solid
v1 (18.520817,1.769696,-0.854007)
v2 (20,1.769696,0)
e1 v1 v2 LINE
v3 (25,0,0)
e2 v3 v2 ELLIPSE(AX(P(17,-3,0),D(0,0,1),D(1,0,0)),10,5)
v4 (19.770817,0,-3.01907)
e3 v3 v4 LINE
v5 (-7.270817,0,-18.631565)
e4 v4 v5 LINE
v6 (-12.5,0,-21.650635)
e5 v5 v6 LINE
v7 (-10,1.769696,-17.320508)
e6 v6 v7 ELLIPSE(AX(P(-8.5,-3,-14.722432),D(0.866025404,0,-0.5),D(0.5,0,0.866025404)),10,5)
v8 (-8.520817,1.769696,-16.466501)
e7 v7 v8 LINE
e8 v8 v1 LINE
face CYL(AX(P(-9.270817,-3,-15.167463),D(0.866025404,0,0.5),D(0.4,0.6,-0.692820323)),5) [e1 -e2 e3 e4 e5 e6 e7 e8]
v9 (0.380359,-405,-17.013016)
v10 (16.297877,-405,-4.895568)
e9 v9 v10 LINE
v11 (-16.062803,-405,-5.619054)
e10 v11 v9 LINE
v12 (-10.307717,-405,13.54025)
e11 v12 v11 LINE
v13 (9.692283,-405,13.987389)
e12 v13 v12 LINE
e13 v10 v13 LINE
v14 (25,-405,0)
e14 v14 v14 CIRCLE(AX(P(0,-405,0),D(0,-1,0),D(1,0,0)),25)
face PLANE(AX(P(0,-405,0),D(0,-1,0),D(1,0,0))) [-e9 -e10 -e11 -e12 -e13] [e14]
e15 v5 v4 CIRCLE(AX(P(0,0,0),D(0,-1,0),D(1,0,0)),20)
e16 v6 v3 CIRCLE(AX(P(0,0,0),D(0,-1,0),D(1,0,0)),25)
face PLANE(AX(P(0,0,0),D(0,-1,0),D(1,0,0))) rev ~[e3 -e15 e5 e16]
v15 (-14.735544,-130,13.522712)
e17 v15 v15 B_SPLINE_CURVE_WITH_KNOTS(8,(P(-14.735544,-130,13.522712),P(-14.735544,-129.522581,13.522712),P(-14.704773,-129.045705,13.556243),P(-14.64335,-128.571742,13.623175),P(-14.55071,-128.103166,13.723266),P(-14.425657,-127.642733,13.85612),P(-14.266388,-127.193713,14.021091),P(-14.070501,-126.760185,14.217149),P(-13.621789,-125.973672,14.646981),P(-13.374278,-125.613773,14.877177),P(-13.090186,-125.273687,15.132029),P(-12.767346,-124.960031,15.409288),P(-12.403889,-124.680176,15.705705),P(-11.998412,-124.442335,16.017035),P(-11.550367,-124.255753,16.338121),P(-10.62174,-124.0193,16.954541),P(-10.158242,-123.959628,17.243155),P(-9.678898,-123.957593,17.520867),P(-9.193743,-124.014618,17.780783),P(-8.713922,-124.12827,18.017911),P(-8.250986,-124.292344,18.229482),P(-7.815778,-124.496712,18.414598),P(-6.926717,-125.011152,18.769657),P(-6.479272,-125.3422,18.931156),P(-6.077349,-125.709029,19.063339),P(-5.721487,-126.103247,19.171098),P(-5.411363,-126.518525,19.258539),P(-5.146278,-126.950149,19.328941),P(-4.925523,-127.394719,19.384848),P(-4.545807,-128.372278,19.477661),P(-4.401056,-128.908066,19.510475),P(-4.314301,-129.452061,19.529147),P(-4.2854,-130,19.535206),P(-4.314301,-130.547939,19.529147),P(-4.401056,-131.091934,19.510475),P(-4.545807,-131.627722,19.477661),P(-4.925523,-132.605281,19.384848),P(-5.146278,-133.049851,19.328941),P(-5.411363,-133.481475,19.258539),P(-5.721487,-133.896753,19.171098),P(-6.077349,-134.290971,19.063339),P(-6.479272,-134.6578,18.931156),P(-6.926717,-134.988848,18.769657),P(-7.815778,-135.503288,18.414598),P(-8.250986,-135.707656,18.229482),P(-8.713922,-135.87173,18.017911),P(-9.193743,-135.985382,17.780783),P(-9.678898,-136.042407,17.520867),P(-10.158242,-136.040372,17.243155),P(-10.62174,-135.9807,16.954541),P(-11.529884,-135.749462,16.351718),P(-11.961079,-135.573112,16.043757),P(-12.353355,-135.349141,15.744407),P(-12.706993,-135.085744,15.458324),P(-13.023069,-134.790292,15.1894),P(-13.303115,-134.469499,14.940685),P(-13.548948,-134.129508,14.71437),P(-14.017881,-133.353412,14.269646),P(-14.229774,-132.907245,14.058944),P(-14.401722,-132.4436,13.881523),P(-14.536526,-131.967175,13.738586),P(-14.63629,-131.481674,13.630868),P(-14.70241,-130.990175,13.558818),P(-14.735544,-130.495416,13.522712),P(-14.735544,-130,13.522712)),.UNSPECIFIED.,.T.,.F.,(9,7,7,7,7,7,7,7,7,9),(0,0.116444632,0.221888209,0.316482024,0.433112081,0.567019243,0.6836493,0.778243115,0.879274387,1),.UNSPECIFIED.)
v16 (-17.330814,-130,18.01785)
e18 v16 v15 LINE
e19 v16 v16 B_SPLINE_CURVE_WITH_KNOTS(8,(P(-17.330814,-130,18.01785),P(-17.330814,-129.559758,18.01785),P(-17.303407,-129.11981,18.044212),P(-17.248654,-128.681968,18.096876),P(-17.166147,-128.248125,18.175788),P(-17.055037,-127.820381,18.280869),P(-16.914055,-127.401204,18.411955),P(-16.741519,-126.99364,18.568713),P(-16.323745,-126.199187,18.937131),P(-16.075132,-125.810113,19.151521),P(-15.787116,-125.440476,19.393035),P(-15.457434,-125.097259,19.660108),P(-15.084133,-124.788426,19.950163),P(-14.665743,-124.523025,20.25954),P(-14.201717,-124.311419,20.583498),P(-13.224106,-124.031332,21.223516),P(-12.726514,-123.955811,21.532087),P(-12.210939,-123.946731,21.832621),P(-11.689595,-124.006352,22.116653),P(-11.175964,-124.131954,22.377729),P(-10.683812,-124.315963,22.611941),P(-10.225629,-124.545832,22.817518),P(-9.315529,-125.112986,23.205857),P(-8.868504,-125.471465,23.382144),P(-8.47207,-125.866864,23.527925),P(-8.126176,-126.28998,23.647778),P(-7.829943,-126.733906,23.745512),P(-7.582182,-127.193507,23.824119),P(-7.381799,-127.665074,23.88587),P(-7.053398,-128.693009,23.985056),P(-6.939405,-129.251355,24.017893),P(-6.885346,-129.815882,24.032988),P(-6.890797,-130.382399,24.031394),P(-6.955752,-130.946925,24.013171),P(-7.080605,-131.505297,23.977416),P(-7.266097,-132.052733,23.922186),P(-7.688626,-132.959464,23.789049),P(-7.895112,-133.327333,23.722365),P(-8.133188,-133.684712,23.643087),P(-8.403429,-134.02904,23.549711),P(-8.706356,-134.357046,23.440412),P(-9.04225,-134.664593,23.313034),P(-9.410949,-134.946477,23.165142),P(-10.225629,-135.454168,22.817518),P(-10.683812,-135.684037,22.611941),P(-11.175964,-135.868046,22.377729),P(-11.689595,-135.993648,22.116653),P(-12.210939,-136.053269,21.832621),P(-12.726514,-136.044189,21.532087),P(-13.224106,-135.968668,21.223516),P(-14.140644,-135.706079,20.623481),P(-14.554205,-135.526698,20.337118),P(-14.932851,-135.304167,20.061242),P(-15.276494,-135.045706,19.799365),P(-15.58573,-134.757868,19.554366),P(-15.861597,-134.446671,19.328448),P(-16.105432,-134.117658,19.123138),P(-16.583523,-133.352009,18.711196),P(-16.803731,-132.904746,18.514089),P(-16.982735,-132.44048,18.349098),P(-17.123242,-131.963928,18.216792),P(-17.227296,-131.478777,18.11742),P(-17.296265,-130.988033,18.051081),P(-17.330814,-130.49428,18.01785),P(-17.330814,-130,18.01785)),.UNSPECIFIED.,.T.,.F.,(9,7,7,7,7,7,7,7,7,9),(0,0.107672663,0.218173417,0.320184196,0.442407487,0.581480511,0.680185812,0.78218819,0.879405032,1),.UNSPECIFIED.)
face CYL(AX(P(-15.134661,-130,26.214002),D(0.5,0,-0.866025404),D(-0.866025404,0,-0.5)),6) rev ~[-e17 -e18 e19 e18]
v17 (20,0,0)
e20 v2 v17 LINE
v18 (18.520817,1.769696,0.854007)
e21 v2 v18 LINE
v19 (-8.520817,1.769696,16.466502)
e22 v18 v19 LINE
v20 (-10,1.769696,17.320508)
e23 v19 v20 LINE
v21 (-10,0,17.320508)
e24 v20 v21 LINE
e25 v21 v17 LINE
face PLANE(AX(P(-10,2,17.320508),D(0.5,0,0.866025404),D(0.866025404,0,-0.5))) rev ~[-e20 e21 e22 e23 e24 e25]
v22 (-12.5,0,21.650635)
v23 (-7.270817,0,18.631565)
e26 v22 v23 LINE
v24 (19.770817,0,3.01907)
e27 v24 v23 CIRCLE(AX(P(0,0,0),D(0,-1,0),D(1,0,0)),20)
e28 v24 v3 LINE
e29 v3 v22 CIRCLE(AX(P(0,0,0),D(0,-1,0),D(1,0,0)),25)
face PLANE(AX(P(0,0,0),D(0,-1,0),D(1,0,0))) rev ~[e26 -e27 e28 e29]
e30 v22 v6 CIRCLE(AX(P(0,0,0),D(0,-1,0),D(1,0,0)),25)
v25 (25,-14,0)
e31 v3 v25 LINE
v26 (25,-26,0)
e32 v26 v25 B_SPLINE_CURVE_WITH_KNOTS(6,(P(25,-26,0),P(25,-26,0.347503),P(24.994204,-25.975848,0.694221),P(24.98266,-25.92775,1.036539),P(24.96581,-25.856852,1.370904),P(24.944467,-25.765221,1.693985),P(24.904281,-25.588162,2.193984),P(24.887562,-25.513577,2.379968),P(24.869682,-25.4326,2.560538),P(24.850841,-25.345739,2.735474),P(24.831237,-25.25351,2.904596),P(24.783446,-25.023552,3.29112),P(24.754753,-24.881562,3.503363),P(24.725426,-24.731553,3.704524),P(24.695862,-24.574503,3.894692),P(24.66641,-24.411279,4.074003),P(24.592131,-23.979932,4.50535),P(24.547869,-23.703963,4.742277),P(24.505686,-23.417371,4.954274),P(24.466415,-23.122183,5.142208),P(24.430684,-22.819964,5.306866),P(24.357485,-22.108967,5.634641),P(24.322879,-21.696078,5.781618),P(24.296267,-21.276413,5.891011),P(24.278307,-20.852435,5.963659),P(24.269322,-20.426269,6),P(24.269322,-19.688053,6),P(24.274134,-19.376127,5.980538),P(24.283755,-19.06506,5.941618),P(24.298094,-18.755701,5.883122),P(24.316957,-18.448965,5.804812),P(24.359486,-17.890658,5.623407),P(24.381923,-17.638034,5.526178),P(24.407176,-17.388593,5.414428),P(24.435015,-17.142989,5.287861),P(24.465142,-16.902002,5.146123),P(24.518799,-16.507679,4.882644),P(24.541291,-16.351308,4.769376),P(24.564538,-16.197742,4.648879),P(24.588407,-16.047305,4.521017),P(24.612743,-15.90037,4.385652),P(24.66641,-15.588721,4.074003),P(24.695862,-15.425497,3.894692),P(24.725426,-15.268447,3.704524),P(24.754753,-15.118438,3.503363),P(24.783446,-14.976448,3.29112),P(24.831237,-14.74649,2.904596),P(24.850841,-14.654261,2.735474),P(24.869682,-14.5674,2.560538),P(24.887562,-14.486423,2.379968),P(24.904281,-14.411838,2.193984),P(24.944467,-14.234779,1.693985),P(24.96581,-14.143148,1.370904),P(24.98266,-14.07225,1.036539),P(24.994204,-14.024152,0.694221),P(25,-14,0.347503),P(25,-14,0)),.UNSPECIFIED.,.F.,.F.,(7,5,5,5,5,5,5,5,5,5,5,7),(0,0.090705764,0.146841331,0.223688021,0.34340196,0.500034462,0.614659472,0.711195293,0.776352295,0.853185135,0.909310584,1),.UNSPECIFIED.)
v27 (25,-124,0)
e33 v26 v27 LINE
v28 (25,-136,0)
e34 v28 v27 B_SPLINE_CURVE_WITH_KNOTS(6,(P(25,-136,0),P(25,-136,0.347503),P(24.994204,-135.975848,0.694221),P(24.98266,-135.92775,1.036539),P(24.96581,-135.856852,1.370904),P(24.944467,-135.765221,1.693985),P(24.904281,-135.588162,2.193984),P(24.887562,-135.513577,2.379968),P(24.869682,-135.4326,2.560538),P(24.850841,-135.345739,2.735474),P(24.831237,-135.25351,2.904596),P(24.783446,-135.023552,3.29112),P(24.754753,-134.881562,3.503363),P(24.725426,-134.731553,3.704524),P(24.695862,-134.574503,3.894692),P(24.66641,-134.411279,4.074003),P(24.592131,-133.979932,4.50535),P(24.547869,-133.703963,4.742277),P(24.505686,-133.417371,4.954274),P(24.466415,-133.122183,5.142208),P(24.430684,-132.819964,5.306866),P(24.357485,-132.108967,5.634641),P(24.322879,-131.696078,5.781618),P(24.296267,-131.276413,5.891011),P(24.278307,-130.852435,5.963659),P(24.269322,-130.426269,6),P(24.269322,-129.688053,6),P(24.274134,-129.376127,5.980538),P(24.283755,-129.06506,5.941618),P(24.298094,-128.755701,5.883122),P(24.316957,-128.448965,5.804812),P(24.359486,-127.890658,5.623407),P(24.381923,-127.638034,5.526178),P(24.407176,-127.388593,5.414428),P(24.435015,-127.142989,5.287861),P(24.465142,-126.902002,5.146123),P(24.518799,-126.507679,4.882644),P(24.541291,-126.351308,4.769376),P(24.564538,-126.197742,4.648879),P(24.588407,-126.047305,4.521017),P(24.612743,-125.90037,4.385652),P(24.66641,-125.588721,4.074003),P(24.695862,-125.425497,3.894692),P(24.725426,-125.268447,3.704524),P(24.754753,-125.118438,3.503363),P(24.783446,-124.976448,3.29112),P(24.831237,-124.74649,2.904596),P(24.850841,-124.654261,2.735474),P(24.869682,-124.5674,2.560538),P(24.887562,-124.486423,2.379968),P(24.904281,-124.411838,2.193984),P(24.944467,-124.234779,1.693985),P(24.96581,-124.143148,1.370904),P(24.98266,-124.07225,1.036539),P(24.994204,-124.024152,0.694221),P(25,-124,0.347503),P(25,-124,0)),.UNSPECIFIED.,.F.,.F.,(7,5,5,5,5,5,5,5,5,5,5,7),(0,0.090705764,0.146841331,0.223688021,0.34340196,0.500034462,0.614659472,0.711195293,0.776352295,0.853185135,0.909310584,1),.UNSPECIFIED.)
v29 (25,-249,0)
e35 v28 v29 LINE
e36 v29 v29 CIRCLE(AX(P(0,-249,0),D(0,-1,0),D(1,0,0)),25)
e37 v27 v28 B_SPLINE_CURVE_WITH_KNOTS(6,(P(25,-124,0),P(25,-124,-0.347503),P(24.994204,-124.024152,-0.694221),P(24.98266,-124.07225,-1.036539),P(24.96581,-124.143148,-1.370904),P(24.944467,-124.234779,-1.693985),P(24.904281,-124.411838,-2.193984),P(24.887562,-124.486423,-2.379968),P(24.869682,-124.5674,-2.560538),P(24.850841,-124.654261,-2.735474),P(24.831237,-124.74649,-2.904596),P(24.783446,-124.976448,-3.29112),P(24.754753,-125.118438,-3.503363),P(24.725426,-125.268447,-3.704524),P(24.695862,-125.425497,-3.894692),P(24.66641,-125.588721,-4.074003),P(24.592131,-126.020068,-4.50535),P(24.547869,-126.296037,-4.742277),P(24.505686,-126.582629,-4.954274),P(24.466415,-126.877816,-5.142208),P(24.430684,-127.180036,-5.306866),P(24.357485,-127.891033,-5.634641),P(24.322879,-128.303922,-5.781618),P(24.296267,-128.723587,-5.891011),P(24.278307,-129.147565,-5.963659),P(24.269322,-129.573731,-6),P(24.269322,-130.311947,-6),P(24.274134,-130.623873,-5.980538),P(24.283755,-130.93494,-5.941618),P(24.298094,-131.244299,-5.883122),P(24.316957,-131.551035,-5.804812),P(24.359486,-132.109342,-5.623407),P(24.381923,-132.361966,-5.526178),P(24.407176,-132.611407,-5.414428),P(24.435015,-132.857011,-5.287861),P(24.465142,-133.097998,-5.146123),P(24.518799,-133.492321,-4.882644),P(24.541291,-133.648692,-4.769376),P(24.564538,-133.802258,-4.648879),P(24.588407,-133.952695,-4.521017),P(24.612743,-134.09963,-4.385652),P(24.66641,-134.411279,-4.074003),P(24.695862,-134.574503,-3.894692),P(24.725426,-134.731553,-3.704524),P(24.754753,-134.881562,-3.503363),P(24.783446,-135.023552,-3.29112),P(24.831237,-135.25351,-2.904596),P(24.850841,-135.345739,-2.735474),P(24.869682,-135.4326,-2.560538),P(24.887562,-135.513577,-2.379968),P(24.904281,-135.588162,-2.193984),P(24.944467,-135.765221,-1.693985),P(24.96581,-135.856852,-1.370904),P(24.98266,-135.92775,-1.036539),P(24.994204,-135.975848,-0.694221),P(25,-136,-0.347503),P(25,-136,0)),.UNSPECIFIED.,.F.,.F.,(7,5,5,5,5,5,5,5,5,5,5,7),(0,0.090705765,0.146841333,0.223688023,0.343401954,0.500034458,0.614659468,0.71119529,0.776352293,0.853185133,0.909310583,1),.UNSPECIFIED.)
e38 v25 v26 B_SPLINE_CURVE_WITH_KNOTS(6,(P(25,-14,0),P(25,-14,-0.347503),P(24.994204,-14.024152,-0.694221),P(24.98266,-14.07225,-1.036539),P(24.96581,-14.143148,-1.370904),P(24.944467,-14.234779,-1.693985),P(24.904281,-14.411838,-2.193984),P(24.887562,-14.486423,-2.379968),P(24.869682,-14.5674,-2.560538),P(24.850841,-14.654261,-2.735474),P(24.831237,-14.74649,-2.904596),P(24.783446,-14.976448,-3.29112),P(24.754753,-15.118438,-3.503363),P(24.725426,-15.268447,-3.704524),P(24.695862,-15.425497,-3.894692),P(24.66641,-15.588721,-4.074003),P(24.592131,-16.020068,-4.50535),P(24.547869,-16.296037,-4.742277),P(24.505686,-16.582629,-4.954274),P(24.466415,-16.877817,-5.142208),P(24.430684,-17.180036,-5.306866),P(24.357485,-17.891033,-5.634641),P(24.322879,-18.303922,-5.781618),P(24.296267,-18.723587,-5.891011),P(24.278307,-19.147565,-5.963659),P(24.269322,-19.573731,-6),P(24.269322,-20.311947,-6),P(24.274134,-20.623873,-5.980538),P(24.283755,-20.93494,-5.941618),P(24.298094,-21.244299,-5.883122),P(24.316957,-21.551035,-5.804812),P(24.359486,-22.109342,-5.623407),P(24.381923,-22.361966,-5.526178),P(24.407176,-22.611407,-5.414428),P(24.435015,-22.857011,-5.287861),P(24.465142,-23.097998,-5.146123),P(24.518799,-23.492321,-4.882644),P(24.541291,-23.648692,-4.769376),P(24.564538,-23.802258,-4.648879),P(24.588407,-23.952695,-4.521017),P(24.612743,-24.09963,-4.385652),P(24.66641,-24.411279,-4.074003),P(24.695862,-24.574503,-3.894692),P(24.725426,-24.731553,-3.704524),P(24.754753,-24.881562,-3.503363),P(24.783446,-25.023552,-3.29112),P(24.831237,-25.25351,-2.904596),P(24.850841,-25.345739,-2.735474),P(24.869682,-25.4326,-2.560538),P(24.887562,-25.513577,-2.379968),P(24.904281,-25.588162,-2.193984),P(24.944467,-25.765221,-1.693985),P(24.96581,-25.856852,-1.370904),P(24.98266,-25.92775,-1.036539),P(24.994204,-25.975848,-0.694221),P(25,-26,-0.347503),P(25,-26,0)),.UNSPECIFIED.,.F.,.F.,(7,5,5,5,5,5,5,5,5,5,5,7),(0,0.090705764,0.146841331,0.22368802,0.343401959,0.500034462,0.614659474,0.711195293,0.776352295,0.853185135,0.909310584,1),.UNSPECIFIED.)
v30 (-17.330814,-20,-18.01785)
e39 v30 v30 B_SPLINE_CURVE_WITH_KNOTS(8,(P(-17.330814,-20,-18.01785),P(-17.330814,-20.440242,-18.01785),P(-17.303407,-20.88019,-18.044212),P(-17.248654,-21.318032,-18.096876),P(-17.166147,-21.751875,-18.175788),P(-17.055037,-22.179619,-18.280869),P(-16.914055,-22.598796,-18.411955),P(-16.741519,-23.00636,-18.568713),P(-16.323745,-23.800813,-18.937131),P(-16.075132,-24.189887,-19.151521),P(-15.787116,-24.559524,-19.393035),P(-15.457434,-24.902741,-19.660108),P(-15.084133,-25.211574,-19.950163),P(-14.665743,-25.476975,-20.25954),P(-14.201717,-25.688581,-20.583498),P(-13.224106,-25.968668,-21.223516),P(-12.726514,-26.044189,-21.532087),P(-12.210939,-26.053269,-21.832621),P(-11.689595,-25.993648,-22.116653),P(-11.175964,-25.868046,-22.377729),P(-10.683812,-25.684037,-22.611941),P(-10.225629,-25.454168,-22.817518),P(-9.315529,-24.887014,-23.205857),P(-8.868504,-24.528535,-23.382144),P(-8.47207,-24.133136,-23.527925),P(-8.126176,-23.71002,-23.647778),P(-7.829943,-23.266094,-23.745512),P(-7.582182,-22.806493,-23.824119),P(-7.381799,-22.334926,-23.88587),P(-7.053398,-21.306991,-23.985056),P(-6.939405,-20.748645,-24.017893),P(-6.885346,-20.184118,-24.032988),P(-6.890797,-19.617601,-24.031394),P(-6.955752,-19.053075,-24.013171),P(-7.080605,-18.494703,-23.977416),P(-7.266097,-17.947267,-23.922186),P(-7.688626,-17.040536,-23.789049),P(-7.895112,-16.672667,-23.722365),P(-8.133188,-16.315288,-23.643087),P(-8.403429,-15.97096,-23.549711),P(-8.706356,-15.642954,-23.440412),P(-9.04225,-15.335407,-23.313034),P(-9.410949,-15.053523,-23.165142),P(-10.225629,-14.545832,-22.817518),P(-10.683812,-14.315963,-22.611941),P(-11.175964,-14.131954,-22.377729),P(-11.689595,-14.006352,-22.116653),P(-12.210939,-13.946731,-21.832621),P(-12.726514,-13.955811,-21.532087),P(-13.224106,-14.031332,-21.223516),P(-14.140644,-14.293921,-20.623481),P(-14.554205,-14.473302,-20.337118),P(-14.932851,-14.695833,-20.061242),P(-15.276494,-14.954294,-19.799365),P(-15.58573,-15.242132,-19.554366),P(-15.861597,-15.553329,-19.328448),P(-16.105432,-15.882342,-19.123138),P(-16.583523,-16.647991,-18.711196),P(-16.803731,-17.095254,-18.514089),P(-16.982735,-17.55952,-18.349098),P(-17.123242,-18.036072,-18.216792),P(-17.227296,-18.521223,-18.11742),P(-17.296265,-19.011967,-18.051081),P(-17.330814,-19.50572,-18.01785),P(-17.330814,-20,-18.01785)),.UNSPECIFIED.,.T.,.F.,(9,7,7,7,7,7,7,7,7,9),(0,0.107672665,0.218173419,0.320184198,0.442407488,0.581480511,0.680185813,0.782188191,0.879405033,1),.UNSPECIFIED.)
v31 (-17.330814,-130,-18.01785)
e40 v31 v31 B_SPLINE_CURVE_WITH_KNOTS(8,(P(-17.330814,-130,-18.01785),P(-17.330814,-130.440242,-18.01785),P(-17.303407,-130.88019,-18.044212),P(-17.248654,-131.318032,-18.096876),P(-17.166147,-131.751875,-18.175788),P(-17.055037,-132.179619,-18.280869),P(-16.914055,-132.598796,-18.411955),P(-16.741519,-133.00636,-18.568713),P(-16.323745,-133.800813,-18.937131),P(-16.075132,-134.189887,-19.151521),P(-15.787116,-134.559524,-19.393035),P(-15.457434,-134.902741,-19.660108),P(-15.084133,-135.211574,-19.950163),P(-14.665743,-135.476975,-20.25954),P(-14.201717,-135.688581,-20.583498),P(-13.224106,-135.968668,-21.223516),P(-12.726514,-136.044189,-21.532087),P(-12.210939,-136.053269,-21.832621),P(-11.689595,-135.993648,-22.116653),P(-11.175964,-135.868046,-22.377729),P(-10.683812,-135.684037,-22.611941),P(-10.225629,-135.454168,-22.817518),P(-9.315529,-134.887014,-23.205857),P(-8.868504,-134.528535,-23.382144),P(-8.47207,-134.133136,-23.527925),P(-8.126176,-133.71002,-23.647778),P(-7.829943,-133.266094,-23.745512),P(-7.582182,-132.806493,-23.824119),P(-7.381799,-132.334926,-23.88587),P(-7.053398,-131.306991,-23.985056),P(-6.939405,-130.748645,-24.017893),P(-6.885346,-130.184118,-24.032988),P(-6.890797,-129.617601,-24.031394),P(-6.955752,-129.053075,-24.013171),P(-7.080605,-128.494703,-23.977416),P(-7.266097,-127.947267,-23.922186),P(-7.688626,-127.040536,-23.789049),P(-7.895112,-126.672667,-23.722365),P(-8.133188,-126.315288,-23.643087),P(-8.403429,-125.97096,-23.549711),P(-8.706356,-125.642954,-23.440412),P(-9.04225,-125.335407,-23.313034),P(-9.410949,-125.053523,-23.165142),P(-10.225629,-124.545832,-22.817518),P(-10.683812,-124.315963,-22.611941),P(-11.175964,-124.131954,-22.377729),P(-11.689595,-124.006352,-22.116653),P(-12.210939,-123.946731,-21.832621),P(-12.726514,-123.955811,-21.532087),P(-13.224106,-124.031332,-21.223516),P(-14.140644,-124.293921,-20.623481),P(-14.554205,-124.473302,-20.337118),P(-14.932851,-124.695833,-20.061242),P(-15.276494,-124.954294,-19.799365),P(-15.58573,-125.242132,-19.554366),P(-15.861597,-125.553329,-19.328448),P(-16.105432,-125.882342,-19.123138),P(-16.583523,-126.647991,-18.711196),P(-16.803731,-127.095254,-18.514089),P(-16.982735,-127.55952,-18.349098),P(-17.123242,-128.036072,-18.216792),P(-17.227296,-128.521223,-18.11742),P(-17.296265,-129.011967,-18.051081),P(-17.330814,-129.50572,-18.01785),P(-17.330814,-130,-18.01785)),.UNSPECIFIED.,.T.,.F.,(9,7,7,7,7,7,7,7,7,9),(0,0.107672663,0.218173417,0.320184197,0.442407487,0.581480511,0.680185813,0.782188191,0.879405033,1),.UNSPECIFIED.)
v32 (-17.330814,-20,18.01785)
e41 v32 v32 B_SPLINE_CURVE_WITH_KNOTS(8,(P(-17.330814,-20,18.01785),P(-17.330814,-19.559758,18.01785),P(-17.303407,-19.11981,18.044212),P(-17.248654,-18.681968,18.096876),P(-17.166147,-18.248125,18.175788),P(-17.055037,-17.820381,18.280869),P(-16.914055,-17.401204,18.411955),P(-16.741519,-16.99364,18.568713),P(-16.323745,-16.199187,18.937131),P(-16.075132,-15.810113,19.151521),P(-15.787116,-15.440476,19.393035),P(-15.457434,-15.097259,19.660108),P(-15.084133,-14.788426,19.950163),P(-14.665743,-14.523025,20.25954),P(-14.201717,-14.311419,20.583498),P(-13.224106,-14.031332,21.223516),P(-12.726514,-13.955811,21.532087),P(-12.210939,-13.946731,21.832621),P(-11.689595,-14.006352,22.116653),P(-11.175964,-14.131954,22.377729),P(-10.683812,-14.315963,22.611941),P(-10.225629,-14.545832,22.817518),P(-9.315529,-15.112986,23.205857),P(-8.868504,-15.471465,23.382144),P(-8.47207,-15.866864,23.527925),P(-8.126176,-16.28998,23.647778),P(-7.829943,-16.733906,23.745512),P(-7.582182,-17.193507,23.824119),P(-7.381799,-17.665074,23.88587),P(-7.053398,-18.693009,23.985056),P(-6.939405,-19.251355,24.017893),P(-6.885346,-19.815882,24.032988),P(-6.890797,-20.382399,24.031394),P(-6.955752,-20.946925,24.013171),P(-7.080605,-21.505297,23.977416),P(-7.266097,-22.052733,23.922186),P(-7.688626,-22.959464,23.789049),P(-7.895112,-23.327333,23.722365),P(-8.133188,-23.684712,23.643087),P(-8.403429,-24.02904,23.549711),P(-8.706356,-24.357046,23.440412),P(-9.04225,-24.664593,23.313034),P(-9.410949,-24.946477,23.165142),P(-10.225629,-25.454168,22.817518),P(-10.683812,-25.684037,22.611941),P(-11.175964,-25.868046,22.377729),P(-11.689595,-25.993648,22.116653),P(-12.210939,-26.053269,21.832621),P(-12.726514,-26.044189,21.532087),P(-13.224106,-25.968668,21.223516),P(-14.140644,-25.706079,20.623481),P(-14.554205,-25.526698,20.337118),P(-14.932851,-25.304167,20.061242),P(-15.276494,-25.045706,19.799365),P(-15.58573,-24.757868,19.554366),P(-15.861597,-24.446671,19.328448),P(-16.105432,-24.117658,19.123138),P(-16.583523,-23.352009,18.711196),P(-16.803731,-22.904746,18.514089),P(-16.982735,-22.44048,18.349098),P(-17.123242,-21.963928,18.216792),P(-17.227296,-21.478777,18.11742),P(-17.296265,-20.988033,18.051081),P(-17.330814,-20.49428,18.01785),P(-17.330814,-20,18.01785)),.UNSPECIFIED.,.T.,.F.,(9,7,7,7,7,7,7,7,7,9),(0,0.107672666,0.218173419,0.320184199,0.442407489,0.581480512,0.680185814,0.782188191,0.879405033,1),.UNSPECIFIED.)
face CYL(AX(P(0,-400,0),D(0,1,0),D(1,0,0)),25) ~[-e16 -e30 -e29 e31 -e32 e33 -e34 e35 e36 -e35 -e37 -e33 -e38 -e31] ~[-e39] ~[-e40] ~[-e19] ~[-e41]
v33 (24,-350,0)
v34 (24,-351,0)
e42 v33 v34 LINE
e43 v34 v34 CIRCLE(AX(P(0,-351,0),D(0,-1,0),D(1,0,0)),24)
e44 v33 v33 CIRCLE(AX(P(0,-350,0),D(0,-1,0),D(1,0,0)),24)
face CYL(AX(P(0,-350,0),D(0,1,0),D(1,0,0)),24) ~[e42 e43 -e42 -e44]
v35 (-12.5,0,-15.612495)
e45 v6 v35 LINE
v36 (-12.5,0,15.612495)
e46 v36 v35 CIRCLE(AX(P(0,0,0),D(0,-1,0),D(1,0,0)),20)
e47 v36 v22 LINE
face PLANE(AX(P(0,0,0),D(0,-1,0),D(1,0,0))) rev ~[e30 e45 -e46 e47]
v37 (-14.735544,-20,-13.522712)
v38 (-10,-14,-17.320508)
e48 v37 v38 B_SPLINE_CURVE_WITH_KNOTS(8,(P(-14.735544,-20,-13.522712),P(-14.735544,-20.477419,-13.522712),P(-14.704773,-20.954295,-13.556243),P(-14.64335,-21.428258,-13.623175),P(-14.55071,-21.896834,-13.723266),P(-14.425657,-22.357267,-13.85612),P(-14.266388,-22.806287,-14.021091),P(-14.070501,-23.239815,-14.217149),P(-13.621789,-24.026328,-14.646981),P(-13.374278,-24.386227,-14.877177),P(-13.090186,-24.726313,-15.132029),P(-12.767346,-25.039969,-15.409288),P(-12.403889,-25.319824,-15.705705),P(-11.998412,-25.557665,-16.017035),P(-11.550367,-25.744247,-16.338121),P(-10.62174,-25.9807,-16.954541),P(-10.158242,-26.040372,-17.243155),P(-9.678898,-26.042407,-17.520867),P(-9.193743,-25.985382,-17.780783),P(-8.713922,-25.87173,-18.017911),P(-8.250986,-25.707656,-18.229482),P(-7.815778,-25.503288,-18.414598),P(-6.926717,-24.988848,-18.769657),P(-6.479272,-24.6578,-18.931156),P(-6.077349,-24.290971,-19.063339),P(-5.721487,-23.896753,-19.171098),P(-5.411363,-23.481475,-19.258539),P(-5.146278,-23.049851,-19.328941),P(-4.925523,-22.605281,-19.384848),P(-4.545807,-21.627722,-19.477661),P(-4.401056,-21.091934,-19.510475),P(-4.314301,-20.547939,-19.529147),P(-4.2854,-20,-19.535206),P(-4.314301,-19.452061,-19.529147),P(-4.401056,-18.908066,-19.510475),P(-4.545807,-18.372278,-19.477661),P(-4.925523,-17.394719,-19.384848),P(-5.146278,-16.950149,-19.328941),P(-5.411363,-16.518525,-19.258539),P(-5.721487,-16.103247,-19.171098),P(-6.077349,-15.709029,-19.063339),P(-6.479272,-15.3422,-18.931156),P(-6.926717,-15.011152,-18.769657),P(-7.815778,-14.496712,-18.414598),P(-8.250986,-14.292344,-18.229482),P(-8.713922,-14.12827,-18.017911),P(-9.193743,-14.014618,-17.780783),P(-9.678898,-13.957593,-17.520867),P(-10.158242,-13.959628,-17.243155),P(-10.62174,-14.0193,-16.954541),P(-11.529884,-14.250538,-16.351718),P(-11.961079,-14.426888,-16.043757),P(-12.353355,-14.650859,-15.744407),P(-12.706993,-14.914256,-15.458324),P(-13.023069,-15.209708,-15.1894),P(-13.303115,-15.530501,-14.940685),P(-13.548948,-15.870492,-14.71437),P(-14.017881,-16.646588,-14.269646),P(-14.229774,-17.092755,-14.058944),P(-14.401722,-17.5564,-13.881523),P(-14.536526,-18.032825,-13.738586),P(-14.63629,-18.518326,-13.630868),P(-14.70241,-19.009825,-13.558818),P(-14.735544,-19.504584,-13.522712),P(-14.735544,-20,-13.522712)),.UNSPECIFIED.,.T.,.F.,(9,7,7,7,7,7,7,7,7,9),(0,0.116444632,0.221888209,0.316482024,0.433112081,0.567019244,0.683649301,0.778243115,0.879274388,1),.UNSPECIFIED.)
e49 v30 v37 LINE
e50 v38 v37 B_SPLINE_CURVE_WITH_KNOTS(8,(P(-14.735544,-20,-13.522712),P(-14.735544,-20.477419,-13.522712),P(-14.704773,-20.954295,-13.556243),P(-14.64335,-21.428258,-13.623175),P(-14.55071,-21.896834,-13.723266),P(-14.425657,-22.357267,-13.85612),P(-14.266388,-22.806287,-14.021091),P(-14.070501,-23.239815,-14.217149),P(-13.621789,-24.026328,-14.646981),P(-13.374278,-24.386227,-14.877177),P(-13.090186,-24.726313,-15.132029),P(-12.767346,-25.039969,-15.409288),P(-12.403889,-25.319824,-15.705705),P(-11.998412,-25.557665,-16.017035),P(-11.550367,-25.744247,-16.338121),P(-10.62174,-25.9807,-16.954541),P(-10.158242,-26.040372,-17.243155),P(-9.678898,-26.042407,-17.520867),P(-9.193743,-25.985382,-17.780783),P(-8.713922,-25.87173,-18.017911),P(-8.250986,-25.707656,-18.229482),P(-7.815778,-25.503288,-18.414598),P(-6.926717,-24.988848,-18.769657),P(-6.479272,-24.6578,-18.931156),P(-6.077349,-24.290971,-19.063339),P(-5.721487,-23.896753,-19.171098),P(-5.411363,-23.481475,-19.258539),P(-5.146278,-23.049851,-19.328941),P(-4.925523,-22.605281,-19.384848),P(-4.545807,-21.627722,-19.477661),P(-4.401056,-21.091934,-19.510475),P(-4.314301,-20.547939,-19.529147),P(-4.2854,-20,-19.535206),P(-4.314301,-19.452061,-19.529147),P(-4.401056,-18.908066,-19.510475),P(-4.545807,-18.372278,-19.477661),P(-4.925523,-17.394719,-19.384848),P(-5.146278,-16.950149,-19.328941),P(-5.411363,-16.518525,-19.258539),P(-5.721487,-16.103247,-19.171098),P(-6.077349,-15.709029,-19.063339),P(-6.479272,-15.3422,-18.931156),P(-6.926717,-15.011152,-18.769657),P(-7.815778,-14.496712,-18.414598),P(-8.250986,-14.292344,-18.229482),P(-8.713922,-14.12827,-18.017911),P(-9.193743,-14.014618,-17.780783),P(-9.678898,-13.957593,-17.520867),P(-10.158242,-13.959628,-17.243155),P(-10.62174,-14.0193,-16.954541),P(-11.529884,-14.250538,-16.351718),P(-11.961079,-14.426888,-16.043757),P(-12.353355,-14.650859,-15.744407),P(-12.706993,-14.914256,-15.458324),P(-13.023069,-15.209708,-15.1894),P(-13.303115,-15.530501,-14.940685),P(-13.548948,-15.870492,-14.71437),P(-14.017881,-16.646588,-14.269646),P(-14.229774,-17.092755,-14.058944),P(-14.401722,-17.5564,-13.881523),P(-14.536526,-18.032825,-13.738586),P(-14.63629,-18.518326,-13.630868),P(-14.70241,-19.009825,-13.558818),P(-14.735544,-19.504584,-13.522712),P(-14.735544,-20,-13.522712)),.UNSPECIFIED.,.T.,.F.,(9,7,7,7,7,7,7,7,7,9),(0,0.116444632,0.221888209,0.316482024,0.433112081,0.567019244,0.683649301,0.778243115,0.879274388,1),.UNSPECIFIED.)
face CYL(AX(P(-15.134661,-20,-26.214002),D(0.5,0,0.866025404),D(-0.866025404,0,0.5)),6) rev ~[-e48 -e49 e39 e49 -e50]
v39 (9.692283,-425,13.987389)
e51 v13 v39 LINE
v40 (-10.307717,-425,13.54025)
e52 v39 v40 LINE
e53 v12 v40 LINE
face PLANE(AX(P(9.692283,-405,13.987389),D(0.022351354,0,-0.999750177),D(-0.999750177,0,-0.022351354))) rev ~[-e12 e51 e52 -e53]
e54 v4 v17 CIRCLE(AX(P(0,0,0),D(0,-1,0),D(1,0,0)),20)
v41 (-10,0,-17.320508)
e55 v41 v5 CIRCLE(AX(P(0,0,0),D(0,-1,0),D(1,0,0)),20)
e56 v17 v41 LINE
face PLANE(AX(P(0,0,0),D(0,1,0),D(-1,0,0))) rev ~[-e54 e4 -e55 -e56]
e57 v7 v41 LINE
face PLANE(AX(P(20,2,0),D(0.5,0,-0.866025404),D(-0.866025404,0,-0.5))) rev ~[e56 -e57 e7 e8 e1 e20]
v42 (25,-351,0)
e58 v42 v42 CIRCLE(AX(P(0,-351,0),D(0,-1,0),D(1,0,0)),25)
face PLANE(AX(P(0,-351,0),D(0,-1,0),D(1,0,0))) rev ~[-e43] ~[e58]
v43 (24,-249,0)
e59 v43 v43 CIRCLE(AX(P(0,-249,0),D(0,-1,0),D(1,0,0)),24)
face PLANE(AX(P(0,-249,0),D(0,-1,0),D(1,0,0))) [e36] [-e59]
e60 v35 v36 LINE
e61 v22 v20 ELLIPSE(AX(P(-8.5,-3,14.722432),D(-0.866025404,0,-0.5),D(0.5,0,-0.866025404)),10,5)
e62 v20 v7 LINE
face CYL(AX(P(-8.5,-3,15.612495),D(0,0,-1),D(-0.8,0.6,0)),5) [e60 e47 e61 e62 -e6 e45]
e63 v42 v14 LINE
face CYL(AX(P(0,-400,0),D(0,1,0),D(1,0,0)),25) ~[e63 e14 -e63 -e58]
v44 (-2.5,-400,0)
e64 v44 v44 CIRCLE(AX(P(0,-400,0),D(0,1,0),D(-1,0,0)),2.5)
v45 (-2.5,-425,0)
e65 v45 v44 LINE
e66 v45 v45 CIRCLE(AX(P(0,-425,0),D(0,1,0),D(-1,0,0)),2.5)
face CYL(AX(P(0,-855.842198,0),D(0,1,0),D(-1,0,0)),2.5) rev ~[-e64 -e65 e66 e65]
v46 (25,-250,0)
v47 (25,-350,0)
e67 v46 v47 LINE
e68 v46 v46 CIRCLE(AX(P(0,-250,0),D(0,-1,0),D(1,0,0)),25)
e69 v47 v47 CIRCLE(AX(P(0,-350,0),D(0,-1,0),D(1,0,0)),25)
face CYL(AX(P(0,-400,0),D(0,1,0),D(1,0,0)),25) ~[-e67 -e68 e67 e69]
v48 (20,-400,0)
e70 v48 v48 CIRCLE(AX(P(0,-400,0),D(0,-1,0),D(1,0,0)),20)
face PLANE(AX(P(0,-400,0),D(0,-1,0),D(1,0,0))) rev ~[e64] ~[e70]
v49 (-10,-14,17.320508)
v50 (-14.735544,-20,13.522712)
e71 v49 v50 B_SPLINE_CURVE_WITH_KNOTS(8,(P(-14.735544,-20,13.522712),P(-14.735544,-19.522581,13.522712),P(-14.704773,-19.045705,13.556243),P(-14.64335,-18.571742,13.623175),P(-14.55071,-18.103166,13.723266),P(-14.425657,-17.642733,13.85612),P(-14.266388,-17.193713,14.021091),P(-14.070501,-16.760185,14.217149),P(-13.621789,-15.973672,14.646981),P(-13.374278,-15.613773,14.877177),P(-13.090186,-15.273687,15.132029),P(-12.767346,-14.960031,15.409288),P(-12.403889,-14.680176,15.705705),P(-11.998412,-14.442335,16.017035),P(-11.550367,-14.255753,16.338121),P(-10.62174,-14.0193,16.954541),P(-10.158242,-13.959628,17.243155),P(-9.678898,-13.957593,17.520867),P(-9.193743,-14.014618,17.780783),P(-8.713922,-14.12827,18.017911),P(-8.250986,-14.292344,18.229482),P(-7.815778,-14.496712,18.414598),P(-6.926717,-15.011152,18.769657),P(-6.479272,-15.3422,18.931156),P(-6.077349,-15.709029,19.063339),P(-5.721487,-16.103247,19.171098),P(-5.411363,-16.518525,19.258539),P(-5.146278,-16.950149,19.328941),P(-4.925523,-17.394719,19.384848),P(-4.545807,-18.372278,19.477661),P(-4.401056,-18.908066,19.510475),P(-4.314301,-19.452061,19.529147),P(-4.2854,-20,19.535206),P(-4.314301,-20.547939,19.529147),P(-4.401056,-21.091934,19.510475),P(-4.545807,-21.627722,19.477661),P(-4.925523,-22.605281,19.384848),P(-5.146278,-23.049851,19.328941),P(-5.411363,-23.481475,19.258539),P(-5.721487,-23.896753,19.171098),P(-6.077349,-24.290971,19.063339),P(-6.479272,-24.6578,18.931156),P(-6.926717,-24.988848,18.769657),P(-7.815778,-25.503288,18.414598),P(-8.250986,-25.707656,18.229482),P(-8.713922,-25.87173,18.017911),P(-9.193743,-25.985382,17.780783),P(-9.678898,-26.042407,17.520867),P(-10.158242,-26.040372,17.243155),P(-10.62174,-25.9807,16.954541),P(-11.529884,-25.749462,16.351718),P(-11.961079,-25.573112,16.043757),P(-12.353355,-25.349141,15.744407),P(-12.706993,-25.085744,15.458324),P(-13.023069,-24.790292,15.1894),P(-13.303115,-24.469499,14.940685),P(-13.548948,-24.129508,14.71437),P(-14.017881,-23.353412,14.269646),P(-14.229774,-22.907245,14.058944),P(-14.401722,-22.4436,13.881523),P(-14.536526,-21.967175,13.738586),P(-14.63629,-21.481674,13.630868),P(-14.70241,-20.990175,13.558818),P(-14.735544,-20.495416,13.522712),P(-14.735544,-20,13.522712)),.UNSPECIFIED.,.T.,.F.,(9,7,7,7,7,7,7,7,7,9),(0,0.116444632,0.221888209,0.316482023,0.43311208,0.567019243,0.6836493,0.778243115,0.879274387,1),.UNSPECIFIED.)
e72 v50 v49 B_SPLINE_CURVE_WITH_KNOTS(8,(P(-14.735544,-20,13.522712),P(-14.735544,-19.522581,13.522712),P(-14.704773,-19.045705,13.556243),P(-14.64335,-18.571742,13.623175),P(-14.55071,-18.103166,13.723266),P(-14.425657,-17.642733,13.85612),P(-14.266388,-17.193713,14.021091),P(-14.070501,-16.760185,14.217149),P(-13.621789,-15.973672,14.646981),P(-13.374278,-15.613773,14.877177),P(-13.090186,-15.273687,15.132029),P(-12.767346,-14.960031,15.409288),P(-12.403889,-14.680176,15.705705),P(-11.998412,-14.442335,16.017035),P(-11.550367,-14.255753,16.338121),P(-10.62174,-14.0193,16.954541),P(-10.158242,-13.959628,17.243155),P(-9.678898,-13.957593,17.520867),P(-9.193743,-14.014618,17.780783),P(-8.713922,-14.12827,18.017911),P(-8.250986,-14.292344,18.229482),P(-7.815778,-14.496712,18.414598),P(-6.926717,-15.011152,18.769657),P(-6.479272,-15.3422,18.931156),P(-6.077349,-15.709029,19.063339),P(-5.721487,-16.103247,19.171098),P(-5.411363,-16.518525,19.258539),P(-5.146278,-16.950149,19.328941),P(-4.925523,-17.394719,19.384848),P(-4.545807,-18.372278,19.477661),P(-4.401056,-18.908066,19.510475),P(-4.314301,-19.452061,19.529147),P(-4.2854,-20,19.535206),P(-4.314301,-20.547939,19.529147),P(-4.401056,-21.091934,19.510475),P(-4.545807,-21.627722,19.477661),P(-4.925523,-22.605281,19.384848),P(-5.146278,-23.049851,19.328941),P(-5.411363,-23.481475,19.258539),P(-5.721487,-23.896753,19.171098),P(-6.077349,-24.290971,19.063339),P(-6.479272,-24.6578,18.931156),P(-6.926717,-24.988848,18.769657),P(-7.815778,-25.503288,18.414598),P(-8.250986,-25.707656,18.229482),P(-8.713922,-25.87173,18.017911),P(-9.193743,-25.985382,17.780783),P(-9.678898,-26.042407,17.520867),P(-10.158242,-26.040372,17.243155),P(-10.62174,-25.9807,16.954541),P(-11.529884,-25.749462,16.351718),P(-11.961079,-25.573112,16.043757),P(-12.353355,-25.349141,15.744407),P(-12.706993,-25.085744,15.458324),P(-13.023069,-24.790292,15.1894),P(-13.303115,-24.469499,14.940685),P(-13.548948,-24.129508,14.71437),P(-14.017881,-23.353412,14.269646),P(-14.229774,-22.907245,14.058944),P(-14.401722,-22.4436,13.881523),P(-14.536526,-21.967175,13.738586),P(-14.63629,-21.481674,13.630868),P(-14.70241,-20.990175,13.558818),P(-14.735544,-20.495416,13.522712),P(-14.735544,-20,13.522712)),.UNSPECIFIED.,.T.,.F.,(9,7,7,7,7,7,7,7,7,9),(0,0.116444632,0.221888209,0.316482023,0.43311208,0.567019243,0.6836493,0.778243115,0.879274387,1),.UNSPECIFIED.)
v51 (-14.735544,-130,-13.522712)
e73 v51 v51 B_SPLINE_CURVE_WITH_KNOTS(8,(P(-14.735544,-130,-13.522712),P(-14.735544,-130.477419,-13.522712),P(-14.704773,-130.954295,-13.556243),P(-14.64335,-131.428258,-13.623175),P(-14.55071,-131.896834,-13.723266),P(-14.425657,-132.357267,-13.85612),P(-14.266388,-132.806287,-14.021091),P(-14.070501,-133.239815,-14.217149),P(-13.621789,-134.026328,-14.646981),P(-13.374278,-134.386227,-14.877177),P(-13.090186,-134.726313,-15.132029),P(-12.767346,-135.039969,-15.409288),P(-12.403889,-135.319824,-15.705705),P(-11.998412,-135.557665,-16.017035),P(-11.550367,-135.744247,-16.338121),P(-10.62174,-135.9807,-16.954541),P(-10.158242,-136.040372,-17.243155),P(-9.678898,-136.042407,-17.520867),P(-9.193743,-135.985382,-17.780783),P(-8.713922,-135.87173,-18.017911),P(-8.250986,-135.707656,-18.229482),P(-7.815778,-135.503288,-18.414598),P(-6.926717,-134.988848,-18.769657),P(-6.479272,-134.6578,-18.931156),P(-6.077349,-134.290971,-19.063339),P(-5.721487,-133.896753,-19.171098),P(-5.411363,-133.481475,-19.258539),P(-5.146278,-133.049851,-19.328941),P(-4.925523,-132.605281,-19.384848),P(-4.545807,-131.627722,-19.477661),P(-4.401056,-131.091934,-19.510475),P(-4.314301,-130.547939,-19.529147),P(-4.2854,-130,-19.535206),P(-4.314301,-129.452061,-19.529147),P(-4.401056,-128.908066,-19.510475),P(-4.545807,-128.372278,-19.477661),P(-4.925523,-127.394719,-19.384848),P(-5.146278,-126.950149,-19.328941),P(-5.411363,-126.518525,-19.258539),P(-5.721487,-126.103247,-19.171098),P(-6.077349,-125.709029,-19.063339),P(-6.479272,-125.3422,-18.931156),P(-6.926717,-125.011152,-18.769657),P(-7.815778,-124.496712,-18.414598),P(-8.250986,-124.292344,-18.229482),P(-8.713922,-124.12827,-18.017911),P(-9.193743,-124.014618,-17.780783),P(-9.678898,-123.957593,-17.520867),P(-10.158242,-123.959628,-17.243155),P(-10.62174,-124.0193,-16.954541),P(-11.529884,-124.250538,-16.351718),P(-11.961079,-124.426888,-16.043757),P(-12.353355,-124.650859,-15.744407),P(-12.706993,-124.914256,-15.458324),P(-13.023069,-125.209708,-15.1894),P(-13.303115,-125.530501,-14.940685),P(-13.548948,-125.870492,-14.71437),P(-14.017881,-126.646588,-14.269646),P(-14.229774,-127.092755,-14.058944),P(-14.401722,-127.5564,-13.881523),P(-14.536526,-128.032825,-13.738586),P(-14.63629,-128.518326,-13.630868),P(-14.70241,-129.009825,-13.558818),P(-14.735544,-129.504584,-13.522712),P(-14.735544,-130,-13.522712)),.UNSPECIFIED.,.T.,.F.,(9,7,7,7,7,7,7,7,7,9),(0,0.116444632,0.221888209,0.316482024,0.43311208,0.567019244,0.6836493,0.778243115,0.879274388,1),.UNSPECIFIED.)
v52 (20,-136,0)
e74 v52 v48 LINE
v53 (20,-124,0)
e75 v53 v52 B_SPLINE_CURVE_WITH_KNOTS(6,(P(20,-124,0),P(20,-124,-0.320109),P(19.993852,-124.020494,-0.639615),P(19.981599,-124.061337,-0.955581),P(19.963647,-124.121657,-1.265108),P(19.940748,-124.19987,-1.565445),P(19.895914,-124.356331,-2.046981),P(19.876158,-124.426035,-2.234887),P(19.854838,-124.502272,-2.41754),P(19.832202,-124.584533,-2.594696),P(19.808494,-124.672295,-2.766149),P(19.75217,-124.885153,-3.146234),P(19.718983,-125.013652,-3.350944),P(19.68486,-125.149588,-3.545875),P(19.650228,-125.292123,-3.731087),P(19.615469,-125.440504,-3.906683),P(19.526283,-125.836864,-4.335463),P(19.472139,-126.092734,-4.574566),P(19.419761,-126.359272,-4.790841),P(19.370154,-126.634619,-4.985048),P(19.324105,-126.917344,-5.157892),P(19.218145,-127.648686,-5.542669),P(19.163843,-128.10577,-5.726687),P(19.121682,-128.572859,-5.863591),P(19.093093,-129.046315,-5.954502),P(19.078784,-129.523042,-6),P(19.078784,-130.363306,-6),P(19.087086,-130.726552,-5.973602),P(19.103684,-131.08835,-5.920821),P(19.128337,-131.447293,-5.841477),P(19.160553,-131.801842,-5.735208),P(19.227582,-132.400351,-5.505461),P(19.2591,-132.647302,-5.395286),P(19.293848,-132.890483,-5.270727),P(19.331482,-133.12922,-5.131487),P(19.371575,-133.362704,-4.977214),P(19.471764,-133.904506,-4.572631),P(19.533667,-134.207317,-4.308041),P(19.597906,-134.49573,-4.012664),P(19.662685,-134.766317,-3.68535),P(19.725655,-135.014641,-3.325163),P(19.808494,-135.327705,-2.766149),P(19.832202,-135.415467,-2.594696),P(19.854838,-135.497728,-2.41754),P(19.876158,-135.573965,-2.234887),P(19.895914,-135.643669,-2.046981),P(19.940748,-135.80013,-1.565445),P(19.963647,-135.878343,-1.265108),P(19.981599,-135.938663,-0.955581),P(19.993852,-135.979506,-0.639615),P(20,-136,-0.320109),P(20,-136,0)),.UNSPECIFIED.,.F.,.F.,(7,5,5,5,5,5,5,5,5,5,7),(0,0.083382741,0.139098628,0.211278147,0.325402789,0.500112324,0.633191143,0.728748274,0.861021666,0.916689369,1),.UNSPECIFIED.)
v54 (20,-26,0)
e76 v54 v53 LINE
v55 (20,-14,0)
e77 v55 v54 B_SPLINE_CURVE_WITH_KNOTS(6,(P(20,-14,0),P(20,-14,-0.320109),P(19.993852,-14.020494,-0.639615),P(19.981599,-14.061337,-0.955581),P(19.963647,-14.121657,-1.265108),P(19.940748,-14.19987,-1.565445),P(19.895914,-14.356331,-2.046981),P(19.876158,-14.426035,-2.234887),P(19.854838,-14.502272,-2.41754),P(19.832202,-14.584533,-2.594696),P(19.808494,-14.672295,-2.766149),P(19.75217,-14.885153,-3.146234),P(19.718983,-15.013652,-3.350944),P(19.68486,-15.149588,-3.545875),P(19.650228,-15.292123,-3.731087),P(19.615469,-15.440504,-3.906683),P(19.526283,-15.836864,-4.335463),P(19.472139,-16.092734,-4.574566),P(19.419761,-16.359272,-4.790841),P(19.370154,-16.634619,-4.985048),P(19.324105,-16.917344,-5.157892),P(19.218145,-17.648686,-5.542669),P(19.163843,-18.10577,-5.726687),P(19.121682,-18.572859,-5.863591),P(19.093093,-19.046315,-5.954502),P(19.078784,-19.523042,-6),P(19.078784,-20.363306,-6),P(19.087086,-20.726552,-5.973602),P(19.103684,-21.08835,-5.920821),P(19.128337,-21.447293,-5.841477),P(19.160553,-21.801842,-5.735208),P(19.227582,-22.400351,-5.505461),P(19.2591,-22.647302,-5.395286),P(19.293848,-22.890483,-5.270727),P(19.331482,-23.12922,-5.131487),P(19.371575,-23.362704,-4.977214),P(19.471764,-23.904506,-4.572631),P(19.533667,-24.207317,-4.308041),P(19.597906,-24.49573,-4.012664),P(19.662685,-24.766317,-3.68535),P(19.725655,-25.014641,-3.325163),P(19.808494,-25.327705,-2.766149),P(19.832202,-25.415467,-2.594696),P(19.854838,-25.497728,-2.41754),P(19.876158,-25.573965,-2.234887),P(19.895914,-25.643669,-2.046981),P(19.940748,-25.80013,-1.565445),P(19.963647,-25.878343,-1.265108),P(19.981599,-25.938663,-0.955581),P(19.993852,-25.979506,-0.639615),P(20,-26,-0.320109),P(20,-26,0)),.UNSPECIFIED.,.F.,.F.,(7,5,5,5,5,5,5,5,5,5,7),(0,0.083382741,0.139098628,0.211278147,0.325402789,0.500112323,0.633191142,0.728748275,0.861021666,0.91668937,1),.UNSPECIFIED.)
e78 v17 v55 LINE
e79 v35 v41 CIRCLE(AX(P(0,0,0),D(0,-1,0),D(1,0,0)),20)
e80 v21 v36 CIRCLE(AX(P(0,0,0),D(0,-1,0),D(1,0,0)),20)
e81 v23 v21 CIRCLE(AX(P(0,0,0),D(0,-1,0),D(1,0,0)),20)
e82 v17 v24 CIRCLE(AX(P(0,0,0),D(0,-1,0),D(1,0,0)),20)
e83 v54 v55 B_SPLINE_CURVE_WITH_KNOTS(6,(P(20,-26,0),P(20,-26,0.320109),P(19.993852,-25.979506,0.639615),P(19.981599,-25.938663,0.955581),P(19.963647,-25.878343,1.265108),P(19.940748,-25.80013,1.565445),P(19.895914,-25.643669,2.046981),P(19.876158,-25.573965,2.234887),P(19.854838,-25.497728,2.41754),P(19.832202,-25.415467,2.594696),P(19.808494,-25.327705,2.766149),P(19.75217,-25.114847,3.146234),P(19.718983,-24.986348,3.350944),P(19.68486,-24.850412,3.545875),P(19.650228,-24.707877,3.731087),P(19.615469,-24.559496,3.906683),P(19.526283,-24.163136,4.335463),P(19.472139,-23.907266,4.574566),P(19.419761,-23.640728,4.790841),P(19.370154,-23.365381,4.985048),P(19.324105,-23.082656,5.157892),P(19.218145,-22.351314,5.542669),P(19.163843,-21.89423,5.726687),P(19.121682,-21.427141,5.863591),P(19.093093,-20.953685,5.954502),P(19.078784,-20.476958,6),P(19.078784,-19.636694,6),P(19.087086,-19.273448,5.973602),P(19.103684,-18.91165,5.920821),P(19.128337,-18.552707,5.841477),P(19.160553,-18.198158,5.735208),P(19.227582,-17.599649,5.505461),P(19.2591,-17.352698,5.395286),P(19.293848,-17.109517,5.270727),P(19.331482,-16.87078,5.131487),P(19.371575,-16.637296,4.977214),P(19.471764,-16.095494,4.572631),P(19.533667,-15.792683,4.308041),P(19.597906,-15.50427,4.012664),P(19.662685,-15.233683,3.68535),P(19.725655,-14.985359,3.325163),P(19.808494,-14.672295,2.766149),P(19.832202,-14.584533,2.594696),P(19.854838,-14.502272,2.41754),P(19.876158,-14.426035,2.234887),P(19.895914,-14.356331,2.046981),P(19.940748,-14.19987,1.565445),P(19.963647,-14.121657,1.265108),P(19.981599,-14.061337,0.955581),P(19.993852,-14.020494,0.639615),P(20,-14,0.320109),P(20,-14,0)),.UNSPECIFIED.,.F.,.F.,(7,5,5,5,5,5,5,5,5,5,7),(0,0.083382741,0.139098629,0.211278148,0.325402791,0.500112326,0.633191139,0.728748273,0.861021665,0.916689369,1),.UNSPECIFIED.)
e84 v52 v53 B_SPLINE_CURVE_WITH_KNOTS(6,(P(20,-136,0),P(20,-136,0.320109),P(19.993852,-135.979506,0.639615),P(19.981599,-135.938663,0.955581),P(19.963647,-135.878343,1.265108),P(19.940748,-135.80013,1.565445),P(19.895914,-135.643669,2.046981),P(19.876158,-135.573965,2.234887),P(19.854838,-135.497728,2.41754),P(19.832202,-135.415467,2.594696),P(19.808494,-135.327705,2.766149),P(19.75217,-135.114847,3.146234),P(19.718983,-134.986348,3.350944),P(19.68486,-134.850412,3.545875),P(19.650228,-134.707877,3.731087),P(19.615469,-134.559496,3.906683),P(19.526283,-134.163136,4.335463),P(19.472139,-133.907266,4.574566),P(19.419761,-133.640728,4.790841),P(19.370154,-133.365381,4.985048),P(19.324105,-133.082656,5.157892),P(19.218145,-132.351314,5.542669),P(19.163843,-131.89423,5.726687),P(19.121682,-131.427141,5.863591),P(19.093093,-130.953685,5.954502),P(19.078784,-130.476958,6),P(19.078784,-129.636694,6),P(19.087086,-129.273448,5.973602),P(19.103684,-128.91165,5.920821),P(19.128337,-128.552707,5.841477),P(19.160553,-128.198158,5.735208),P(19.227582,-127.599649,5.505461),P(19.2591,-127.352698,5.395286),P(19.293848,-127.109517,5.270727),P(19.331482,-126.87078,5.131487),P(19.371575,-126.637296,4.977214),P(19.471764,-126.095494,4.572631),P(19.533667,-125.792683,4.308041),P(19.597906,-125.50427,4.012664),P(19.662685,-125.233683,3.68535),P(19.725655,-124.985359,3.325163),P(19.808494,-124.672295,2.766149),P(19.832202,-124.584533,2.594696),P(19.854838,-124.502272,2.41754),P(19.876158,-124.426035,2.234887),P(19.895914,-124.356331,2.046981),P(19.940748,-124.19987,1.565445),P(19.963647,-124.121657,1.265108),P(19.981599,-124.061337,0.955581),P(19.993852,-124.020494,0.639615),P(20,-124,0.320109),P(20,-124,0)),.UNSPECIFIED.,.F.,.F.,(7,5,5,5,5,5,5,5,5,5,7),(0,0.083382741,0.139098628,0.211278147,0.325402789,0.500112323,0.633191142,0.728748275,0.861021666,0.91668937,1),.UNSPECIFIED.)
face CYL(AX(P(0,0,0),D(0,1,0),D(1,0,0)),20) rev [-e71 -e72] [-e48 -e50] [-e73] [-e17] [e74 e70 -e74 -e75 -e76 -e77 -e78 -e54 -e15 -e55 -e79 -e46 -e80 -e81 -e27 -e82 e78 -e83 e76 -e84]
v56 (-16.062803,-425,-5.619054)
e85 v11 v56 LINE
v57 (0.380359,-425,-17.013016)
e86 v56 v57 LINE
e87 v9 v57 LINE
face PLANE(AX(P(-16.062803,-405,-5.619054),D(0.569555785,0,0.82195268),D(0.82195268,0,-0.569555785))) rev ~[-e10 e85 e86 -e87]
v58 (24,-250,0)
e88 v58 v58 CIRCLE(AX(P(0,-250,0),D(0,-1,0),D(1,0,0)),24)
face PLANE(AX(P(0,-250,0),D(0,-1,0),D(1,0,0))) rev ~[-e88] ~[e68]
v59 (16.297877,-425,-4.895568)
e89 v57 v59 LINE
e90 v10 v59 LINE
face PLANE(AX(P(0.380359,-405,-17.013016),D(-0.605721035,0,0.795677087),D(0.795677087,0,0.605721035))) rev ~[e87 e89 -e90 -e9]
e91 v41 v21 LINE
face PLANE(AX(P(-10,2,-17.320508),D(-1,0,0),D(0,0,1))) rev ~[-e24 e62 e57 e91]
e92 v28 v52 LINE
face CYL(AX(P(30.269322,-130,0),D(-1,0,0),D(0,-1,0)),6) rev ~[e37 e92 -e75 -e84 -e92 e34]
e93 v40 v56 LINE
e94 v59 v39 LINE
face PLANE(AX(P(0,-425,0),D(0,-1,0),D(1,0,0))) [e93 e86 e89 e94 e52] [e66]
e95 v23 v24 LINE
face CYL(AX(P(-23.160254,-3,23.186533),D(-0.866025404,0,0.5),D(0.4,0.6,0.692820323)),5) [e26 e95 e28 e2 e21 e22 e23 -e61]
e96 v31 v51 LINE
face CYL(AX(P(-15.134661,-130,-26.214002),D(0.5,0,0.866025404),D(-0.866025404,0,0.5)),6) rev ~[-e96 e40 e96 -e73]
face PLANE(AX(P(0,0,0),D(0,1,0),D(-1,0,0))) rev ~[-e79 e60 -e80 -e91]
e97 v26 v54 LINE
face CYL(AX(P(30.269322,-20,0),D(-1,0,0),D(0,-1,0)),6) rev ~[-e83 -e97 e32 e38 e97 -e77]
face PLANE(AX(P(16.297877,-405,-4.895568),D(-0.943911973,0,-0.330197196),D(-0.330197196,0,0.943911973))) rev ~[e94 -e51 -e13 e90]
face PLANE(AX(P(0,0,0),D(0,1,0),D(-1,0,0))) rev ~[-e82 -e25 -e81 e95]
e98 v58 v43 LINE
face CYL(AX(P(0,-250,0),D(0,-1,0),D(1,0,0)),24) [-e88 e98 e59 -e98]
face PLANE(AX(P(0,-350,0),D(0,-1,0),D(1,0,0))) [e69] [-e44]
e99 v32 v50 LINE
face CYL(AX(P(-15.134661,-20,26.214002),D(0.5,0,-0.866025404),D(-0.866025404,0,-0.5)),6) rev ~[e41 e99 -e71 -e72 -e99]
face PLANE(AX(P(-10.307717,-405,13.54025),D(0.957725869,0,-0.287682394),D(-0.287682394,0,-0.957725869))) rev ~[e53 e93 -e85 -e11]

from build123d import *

# Parameters (mm, degrees)
F0_R          = 25
F0_R_2        = 20
F1_DEPTH      = 400
F2_R          = 25
F3_DEPTH      = 5
F5_DEPTH      = 20
F7_D          = 5
F10_D         = 12
F10_DEPTH     = 6
F10_START     = 0.7306779
F10_TIP       = 3.6051637142
F12_DEPTH     = 2
F17_D         = 12
F17_DEPTH     = 6
F17_START     = 0.7306779
F17_TIP       = 3.6051637142
F19_D         = 12
F19_DEPTH     = 6
F19_START     = 0.7306779
F19_TIP       = 3.6051637142
F21_R         = 25
F21_R_2       = 24
F22_DEPTH     = 1
F24_R         = 25
F24_R_2       = 24
F25_DEPTH     = 1
F27_DEPTH     = 20
F28_T1_DEPTH  = 16.0381401647
F28_T3_DEPTH  = 31.2249898061
F28_T5_DEPTH  = 16.0381402184
F28_T7_DEPTH  = 16.0381401647
F28_T9_DEPTH  = 31.2249898061
F28_T11_DEPTH = 16.0381402184
F28_T13_DEPTH = 16.0381401647
F28_T15_DEPTH = 31.2249898061
F28_T17_DEPTH = 16.0381402184


# Not quite as in the source:
# - a fillet or chamfer that OpenCascade refuses, or shapes differently, is made with other operations: its cross-section is extruded or revolved along the edge and cut away or added


with BuildPart() as f1:
    # F0 (on Front) → F1 (new body)
    with BuildSketch(Plane.XZ):
        Circle(F0_R)
        Circle(F0_R_2, mode=Mode.SUBTRACT)
    extrude(amount=F1_DEPTH)

    # F2 (on face) → F3 (join)
    with BuildSketch(Plane.XZ.offset(400)):
        Circle(F2_R)
    extrude(amount=F3_DEPTH)

    # F4 (on face) → F5 (join)
    with BuildSketch(Plane.XZ.offset(405)):
        Polygon((-16.0628025015, -5.6190539991), (0.380358971, -17.013016167), (16.2978772735, -4.8955682433), (9.6922831285, 13.9873885984), (-10.3077168715, 13.540249811), align=None)
    extrude(amount=F5_DEPTH)

    # F7 (through all)
    with Locations(Plane.XZ.offset(425)):
        with Locations((0, 0)):
            Hole(F7_D / 2)

    # F10
    # its depths count from where the whole tool has entered the part; down to there all is cleared
    with Locations(Plane.YZ.offset(25).offset(-F10_START)):
        with Locations((-20, 0), (-130, 0)):
            Hole(F10_D / 2, depth=F10_DEPTH)
            with Locations((0, 0, -(F10_DEPTH + F10_TIP / 2))):  # 118° drill point
                Cone(0, F10_D / 2, F10_TIP, mode=Mode.SUBTRACT)

    # F11 (on face) → F12 (join)
    with BuildSketch(Plane(origin=(0, 0, 0), x_dir=(-1, 0, 0), z_dir=(0, 1, 0))):
        Polygon((12.5, -21.6506350946), (12.5, 21.6506350946), (-25, 0), align=None)
    extrude(amount=F12_DEPTH)

    # F17
    # its depths count from where the whole tool has entered the part; down to there all is cleared
    with Locations(Plane(origin=(-12.5, 0, -21.6506350946), x_dir=(0.8660254038, 0, -0.5), z_dir=(-0.5, 0, -0.8660254038)).offset(-F17_START)):
        with Locations((0, 20), (0, 130)):
            Hole(F17_D / 2, depth=F17_DEPTH)
            with Locations((0, 0, -(F17_DEPTH + F17_TIP / 2))):  # 118° drill point
                Cone(0, F17_D / 2, F17_TIP, mode=Mode.SUBTRACT)

    # F19
    # its depths count from where the whole tool has entered the part; down to there all is cleared
    with Locations(Plane(origin=(-12.5, 0, 21.6506350946), x_dir=(0.8660254038, 0, 0.5), z_dir=(-0.5, 0, 0.8660254038)).offset(-F19_START)):
        with Locations((0, -20), (0, -130)):
            Hole(F19_D / 2, depth=F19_DEPTH)
            with Locations((0, 0, -(F19_DEPTH + F19_TIP / 2))):  # 118° drill point
                Cone(0, F19_D / 2, F19_TIP, mode=Mode.SUBTRACT)

    # F21 (on offset) → F22 (cut)
    with BuildSketch(Plane.XZ.offset(250)):
        Circle(F21_R)
        Circle(F21_R_2, mode=Mode.SUBTRACT)
    extrude(amount=-F22_DEPTH, mode=Mode.SUBTRACT)

    # F24 (on offset) → F25 (cut)
    with BuildSketch(Plane.XZ.offset(350)):
        Circle(F24_R)
        Circle(F24_R_2, mode=Mode.SUBTRACT)
    extrude(amount=F25_DEPTH, mode=Mode.SUBTRACT)

    # F26 (on face) → F27 (cut)
    with BuildSketch(Plane(origin=(0, 2, 0), x_dir=(-1, 0, 0), z_dir=(0, 1, 0))):
        Polygon((-20, 0), (10, -17.3205080757), (10, 17.3205080757), align=None)
    extrude(amount=-F27_DEPTH, mode=Mode.SUBTRACT)

    # F28: fillet of radius 5 on 3 edges, made by hand

    # F28_s2 → F28_t1 (cut)
    with BuildSketch(Plane(origin=(27.4102540378, 0, 15.8253175473), x_dir=(0, 1, 0), z_dir=(-0.8660254038, 0, -0.5))):
        with BuildLine():
            ThreePointArc((0, 12.5), (1.472135955, 10.7360679775), (2, 8.5))
            Line((2, 8.5), (2, 12.5))
            Line((2, 12.5), (0, 12.5))
        make_face()
    extrude(amount=F28_T1_DEPTH, mode=Mode.SUBTRACT)

    # F28_s4 → F28_t3 (cut)
    with BuildSketch(Plane(origin=(13.5208172258, 0, 7.806247465), x_dir=(0, 1, 0), z_dir=(-0.8660254038, 0, -0.5))):
        with BuildLine():
            ThreePointArc((0, 12.5), (1.472135955, 10.7360679775), (2, 8.5))
            Line((2, 8.5), (2, 12.5))
            Line((2, 12.5), (0, 12.5))
        make_face()
    extrude(amount=F28_T3_DEPTH, mode=Mode.SUBTRACT)

    # F28_s6 → F28_t5 (cut)
    with BuildSketch(Plane(origin=(-13.5208171792, 0, -7.8062474381), x_dir=(0, 1, 0), z_dir=(-0.8660254038, 0, -0.5))):
        with BuildLine():
            ThreePointArc((0, 12.5), (1.472135955, 10.7360679775), (2, 8.5))
            Line((2, 8.5), (2, 12.5))
            Line((2, 12.5), (0, 12.5))
        make_face()
    extrude(amount=F28_T5_DEPTH, mode=Mode.SUBTRACT)

    # F28_s8 → F28_t7 (cut)
    with BuildSketch(Plane.XY.offset(-31.6506350946)):
        with BuildLine():
            ThreePointArc((-12.5, 0), (-10.7360679775, 1.472135955), (-8.5, 2))
            Line((-8.5, 2), (-12.5, 2))
            Line((-12.5, 2), (-12.5, 0))
        make_face()
    extrude(amount=F28_T7_DEPTH, mode=Mode.SUBTRACT)

    # F28_s10 → F28_t9 (cut)
    with BuildSketch(Plane.XY.offset(-15.61249493)):
        with BuildLine():
            ThreePointArc((-12.5, 0), (-10.7360679775, 1.472135955), (-8.5, 2))
            Line((-8.5, 2), (-12.5, 2))
            Line((-12.5, 2), (-12.5, 0))
        make_face()
    extrude(amount=F28_T9_DEPTH, mode=Mode.SUBTRACT)

    # F28_s12 → F28_t11 (cut)
    with BuildSketch(Plane.XY.offset(15.6124948762)):
        with BuildLine():
            ThreePointArc((-12.5, 0), (-10.7360679775, 1.472135955), (-8.5, 2))
            Line((-8.5, 2), (-12.5, 2))
            Line((-12.5, 2), (-12.5, 0))
        make_face()
    extrude(amount=F28_T11_DEPTH, mode=Mode.SUBTRACT)

    # F28_s14 → F28_t13 (cut)
    with BuildSketch(Plane(origin=(-27.4102540378, 0, 15.8253175473), x_dir=(0, 1, 0), z_dir=(0.8660254038, 0, -0.5))):
        with BuildLine():
            ThreePointArc((0, 12.5), (1.472135955, 10.7360679775), (2, 8.5))
            Line((2, 8.5), (2, 12.5))
            Line((2, 12.5), (0, 12.5))
        make_face()
    extrude(amount=F28_T13_DEPTH, mode=Mode.SUBTRACT)

    # F28_s16 → F28_t15 (cut)
    with BuildSketch(Plane(origin=(-13.5208172258, 0, 7.806247465), x_dir=(0, 1, 0), z_dir=(0.8660254038, 0, -0.5))):
        with BuildLine():
            ThreePointArc((0, 12.5), (1.472135955, 10.7360679775), (2, 8.5))
            Line((2, 8.5), (2, 12.5))
            Line((2, 12.5), (0, 12.5))
        make_face()
    extrude(amount=F28_T15_DEPTH, mode=Mode.SUBTRACT)

    # F28_s18 → F28_t17 (cut)
    with BuildSketch(Plane(origin=(13.5208171792, 0, -7.8062474381), x_dir=(0, 1, 0), z_dir=(0.8660254038, 0, -0.5))):
        with BuildLine():
            ThreePointArc((0, 12.5), (1.472135955, 10.7360679775), (2, 8.5))
            Line((2, 8.5), (2, 12.5))
            Line((2, 12.5), (0, 12.5))
        make_face()
    extrude(amount=F28_T17_DEPTH, mode=Mode.SUBTRACT)


solid = f1.part
